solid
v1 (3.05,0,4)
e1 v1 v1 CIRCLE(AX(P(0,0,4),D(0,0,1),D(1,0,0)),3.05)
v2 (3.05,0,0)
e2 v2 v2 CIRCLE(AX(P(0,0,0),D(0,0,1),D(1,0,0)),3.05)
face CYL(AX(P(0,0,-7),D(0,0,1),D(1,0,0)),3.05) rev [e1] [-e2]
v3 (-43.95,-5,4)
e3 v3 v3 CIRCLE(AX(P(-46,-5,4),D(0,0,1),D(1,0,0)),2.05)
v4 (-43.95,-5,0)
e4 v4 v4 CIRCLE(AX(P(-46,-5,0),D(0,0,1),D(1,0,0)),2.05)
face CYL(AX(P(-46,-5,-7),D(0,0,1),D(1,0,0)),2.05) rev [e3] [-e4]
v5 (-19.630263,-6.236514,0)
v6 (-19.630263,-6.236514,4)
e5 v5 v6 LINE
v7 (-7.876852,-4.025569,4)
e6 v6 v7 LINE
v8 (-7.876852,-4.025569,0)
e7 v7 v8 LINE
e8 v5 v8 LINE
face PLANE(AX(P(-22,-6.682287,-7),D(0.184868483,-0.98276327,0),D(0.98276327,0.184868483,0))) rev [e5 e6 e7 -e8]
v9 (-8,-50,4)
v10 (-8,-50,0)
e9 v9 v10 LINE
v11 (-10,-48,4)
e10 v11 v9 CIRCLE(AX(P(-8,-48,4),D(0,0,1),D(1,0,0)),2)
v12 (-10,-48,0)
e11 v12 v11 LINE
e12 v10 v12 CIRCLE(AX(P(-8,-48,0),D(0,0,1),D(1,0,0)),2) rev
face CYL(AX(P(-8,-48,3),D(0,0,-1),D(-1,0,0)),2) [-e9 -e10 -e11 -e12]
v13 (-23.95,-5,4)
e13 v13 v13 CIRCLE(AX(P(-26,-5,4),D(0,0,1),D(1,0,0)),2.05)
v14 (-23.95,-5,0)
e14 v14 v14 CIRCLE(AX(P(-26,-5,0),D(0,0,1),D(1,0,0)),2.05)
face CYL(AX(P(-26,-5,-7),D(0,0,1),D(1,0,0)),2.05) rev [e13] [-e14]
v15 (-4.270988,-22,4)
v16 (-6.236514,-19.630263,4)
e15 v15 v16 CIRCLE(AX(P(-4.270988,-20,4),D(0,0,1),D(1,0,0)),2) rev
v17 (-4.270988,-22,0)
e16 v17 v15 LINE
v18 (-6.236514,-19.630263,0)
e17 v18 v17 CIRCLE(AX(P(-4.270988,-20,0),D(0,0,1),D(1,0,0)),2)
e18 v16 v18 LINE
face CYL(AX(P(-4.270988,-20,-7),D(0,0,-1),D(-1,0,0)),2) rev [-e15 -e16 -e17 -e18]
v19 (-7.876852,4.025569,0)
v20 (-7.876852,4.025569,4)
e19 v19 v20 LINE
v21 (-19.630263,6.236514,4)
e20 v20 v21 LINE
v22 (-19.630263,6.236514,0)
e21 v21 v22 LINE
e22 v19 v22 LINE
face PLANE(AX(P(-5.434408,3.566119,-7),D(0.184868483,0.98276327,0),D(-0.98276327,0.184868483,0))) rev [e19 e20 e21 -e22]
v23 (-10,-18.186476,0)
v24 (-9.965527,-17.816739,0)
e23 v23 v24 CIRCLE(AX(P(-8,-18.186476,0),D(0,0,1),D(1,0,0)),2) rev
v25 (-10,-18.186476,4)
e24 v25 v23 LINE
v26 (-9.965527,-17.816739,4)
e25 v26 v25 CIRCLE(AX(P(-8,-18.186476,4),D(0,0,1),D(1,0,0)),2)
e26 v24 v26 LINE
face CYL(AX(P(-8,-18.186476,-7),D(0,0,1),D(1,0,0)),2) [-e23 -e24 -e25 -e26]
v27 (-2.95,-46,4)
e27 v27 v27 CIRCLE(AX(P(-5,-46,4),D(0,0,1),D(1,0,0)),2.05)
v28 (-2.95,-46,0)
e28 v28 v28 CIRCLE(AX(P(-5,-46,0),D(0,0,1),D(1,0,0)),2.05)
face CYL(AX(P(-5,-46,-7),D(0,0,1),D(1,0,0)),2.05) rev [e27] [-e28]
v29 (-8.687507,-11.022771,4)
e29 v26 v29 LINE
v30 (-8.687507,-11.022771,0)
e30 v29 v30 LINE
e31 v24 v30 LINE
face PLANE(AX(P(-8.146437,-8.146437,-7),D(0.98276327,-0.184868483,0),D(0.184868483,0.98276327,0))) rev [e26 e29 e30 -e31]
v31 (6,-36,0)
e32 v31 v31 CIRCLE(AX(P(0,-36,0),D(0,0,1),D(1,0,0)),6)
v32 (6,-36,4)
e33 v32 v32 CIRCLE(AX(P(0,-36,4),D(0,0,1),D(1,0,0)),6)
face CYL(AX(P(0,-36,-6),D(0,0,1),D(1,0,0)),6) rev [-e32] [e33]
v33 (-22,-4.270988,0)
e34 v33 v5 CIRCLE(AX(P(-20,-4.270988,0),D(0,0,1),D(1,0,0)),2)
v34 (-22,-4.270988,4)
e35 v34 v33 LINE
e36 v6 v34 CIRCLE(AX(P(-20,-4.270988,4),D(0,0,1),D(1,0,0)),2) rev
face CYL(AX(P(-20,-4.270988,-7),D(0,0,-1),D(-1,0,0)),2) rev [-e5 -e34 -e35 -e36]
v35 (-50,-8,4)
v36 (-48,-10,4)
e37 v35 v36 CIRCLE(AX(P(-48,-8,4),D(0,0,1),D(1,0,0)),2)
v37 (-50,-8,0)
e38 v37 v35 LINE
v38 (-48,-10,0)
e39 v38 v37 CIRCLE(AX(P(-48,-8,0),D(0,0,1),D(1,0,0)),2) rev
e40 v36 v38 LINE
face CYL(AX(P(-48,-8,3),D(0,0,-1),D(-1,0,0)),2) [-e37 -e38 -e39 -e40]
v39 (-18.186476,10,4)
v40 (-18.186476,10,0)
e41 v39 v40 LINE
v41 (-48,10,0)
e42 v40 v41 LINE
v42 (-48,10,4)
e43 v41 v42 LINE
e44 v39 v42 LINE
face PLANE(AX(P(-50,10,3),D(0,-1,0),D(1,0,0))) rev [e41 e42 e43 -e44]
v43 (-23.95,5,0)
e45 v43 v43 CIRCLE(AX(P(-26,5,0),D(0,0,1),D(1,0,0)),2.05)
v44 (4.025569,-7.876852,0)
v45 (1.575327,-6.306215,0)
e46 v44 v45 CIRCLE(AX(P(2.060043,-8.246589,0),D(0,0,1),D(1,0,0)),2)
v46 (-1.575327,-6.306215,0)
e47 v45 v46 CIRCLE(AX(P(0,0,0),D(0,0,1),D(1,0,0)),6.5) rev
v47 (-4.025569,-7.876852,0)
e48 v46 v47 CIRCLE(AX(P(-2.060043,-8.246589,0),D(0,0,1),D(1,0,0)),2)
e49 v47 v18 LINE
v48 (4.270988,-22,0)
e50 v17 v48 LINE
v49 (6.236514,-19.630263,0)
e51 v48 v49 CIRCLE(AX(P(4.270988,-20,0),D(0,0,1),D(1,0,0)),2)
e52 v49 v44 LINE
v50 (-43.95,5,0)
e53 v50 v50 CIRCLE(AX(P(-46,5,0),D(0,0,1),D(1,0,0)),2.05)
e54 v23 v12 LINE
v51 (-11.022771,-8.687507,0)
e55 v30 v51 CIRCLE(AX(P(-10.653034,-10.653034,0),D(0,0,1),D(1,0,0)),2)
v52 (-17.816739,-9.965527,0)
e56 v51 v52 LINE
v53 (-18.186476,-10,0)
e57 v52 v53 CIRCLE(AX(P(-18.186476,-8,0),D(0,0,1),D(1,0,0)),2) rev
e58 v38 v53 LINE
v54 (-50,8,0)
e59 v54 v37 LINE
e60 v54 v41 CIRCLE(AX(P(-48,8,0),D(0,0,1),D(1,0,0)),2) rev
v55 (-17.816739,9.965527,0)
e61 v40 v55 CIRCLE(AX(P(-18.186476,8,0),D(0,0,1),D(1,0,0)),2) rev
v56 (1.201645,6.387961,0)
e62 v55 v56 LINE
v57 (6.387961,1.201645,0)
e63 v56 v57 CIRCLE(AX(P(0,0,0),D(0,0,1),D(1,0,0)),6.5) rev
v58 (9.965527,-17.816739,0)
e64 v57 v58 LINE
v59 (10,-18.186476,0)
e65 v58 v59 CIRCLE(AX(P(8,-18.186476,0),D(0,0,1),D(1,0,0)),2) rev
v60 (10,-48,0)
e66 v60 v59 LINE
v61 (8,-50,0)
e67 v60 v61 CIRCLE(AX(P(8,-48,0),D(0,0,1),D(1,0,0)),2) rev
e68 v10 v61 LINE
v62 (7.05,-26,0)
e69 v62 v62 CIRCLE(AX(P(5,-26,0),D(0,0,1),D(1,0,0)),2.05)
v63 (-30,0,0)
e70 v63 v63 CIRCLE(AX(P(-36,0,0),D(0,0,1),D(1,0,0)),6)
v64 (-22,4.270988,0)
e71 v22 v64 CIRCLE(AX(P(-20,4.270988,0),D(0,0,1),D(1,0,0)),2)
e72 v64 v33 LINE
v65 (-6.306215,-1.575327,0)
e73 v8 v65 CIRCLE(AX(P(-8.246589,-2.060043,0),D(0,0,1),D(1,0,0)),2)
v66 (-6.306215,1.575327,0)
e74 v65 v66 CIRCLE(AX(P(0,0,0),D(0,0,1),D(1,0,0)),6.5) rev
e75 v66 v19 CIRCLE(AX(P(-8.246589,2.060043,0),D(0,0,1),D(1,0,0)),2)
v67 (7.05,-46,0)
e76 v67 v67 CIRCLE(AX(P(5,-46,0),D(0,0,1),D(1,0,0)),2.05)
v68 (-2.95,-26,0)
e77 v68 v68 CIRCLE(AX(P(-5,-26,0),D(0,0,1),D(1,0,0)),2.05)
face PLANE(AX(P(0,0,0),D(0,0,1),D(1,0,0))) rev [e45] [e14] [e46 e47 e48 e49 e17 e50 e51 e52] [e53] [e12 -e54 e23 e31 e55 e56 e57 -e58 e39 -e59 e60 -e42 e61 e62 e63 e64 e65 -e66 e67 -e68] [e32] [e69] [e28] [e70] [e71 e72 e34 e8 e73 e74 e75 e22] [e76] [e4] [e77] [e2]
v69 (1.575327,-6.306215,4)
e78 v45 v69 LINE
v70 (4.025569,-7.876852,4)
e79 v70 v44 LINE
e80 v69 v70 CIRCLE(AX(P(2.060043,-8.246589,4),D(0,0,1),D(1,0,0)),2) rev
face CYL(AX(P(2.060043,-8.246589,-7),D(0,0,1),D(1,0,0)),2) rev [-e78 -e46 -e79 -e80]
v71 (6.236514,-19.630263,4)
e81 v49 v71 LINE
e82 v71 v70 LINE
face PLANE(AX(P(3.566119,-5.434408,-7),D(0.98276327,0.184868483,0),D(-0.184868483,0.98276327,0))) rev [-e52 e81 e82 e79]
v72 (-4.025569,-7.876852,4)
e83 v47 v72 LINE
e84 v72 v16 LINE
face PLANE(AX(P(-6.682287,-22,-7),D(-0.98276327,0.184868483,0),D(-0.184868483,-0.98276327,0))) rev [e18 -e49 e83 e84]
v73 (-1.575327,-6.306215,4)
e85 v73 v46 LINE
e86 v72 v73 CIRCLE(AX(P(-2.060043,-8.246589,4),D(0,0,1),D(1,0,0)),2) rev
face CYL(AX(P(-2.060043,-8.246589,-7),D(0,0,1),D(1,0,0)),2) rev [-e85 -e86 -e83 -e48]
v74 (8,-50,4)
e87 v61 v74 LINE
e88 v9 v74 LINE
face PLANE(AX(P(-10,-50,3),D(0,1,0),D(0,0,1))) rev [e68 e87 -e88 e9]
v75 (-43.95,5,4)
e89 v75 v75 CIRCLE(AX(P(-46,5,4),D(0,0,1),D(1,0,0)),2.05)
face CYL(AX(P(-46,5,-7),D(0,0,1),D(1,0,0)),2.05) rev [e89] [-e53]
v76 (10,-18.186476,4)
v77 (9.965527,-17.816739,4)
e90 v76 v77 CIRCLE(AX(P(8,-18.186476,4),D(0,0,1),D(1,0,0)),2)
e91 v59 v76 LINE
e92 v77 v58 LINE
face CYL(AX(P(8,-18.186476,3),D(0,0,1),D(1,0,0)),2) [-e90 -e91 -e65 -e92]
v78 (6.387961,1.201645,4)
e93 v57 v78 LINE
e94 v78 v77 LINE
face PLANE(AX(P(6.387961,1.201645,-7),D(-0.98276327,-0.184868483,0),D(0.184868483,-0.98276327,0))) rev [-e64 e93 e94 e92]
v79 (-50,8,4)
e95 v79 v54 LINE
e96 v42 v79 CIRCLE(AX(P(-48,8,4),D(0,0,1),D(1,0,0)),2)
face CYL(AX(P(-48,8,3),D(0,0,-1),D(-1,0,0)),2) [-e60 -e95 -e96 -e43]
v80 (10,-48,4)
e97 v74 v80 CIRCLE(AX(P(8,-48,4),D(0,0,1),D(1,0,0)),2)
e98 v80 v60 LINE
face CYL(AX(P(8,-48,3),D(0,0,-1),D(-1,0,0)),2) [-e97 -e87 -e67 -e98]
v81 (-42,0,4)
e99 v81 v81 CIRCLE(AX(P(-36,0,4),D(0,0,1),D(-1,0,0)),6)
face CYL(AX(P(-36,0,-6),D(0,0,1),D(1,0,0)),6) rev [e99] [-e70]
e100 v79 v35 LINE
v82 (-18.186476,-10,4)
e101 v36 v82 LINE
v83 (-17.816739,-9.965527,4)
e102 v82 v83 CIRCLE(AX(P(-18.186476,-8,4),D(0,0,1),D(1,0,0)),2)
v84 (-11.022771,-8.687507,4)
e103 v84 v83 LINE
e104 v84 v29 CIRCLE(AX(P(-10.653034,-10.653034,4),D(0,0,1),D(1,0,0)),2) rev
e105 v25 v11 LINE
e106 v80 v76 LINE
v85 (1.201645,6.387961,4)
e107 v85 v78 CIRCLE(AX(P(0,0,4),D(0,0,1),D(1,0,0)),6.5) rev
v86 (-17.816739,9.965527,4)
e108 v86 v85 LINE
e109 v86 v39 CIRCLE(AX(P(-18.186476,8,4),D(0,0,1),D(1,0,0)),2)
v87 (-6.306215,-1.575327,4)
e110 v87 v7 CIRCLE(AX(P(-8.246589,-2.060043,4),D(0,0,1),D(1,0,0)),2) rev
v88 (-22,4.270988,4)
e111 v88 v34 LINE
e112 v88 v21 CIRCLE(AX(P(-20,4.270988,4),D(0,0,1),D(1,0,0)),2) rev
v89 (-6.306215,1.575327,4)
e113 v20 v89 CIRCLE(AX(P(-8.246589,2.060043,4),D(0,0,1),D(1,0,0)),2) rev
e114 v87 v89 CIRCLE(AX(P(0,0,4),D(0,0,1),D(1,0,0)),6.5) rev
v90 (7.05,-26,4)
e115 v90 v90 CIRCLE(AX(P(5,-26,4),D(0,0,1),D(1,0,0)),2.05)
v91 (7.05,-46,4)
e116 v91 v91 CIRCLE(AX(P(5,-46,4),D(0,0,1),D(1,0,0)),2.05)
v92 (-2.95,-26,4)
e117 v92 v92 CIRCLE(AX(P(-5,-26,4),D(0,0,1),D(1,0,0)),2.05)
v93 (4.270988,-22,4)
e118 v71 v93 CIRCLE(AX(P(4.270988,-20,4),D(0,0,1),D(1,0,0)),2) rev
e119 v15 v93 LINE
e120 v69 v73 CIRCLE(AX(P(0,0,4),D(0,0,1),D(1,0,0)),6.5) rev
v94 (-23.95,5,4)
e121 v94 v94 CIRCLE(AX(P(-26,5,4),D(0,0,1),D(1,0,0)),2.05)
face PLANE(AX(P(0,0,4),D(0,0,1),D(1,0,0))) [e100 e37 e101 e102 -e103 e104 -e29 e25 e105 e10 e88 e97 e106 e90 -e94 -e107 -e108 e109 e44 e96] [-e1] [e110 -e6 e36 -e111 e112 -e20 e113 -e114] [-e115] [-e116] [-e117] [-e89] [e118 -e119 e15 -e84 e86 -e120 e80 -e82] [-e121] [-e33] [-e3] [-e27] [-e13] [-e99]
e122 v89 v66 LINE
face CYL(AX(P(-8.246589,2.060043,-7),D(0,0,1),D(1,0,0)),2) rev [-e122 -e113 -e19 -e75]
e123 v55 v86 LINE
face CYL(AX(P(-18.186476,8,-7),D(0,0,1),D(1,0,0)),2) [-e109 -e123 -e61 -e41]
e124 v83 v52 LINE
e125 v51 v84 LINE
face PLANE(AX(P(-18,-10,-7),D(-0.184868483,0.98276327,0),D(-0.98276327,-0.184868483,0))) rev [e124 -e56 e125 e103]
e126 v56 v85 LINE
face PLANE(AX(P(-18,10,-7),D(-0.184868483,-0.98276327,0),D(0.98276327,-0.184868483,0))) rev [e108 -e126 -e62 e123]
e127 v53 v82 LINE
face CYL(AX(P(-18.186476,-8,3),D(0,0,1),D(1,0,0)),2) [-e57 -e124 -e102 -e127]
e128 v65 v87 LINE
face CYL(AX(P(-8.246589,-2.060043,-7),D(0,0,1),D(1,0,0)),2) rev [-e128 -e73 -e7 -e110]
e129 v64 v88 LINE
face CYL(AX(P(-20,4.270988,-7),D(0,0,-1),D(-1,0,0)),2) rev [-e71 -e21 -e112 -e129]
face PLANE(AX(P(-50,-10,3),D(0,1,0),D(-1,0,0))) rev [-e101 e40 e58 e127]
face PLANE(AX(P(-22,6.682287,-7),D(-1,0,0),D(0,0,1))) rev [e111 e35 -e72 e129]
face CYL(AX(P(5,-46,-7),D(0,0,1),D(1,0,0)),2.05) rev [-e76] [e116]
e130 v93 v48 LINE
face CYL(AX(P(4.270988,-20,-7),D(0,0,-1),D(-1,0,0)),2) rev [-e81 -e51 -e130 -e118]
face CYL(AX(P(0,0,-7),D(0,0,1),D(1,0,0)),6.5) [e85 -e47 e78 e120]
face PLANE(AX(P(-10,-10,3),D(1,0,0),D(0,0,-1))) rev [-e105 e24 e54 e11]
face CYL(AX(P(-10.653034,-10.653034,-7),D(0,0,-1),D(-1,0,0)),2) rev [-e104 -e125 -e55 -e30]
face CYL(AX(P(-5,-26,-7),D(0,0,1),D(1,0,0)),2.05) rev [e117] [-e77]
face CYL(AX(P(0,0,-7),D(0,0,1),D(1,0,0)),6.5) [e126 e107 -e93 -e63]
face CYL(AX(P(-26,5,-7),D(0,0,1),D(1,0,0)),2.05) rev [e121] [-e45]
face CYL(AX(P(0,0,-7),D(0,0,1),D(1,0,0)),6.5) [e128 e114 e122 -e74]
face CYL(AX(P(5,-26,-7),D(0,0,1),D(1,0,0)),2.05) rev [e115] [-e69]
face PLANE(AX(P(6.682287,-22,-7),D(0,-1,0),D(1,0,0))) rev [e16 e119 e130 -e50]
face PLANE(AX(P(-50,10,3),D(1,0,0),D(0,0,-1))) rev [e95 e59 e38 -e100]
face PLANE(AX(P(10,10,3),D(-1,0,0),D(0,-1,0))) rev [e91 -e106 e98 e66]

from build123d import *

# Parameters (mm, degrees)
EXTRUDE_1_DEPTH         = 3
SKETCH_2_R              = 2.05
CUT_EXTRUDE_1_DEPTH     = 10
CUT_EXTRUDE_2_DEPTH     = 10
SKETCH_4_R              = 3.05
CUT_EXTRUDE_3_DEPTH     = 10
SKETCH_5_W              = 14
SKETCH_5_H              = 10
SKETCH_5_W_2            = 10
SKETCH_5_H_2            = 14
CUT_EXTRUDE_4_DEPTH     = 10
FILLET_1_R              = 2
FILLET_2_R              = 2
MOVE_START              = 3
MOVE_FACE_1_OUTLINE_R   = 2.05
MOVE_FACE_1_OUTLINE_R_2 = 3.05
MOVE_FACE_1_DEPTH       = 1
SKETCH_9_W              = 14
SKETCH_9_H              = 10
SKETCH_9_W_2            = 10
SKETCH_9_H_2            = 14
EXTRUDE_2_DEPTH         = 4
SKETCH_14_R             = 6
SKETCH_14_R_2           = 2.05
CUT_EXTRUDE_8_DEPTH     = 10


# Read off the part's stored shape, not the designer's step: 移动面1
with BuildPart() as part:
    # 草图1 → 凸台-拉伸1 (new body)
    with BuildSketch(Plane.XY):
        Polygon((-50, 10), (10, 10), (10, -50), (-10, -50), (-10, -10), (-50, -10), align=None)
    extrude(amount=EXTRUDE_1_DEPTH)

    # 草图2 → 切除-拉伸1 (cut)
    with BuildSketch(Plane.XY.offset(3)):
        with Locations((-26, -5)):
            Circle(SKETCH_2_R)
        with Locations((-46, 5)):
            Circle(SKETCH_2_R)
        with Locations((-46, -5)):
            Circle(SKETCH_2_R)
        with Locations((-26, 5)):
            Circle(SKETCH_2_R)
        with Locations((5, -26)):
            Circle(SKETCH_2_R)
        with Locations((-5, -46)):
            Circle(SKETCH_2_R)
        with Locations((5, -46)):
            Circle(SKETCH_2_R)
        with Locations((-5, -26)):
            Circle(SKETCH_2_R)
    extrude(amount=-CUT_EXTRUDE_1_DEPTH, mode=Mode.SUBTRACT)

    # 草图3 → 切除-拉伸2 (cut)
    with BuildSketch(Plane.XY.offset(3)):
        with BuildLine():
            Line((-18, 10), (1.20164514, 6.387961252))
            ThreePointArc((1.20164514, 6.387961252), (4.596194078, 4.596194078), (6.387961252, 1.20164514))
            Line((6.387961252, 1.20164514), (10, -18))
            Line((10, -18), (10, 10))
            Line((10, 10), (-18, 10))
        make_face()
        Polygon((-18, -10), (-8.146437488, -8.146437488), (-10, -18), align=None)
    extrude(amount=-CUT_EXTRUDE_2_DEPTH, mode=Mode.SUBTRACT)

    # 草图4 → 切除-拉伸3 (cut)
    with BuildSketch(Plane.XY.offset(3)):
        Circle(SKETCH_4_R)
    extrude(amount=-CUT_EXTRUDE_3_DEPTH, mode=Mode.SUBTRACT)

    # 草图5 → 切除-拉伸4 (cut)
    with BuildSketch(Plane.XY.offset(3)):
        with Locations((-36, 0)):
            Rectangle(SKETCH_5_W, SKETCH_5_H)
        with BuildLine():
            Line((-22, 6.682287415), (-22, -6.682287415))
            Line((-22, -6.682287415), (-5.43440841, -3.566119072))
            ThreePointArc((-5.43440841, -3.566119072), (-6.5, 0), (-5.43440841, 3.566119072))
            Line((-5.43440841, 3.566119072), (-22, 6.682287415))
        make_face()
        with BuildLine():
            Line((3.566119072, -5.43440841), (6.682287415, -22))
            Line((6.682287415, -22), (-6.682287415, -22))
            Line((-6.682287415, -22), (-3.566119072, -5.43440841))
            ThreePointArc((-3.566119072, -5.43440841), (0, -6.5), (3.566119072, -5.43440841))
        make_face()
        with Locations((0, -36)):
            Rectangle(SKETCH_5_W_2, SKETCH_5_H_2)
    extrude(amount=-CUT_EXTRUDE_4_DEPTH, mode=Mode.SUBTRACT)

    # 圆角1
    fillet_1_edges = [part.edges().sort_by_distance(p)[0] for p in [
        (-29, 5, 1.5),
        (-29, -5, 1.5),
        (-43, -5, 1.5),
        (-43, 5, 1.5),
        (-3.566119072, -5.43440841, 1.5),
        (3.566119072, -5.43440841, 1.5),
        (6.682287415, -22, 1.5),
        (-6.682287415, -22, 1.5),
        (5, -43, 1.5),
        (-5, -43, 1.5),
        (-5, -29, 1.5),
        (5, -29, 1.5),
        (-22, 6.682287415, 1.5),
        (-5.43440841, 3.566119072, 1.5),
        (-5.43440841, -3.566119072, 1.5),
        (-22, -6.682287415, 1.5),
    ]]
    fillet(fillet_1_edges, radius=FILLET_1_R)

    # 圆角2
    fillet_2_edges = [part.edges().sort_by_distance(p)[0] for p in [
        (-50, 10, 1.5),
        (10, -50, 1.5),
        (-10, -50, 1.5),
        (-50, -10, 1.5),
        (-18, -10, 1.5),
        (-8.146437488, -8.146437488, 1.5),
        (-10, -18, 1.5),
        (-18, 10, 1.5),
        (10, -18, 1.5),
    ]]
    fillet(fillet_2_edges, radius=FILLET_2_R)

    # Move Face 1 outline → Move Face 1 (add)
    with BuildSketch(Plane.XY.offset(MOVE_START)):
        with BuildLine():
            Line((-50, 8), (-50, -8))
            ThreePointArc((-50, -8), (-49.414213562, -9.414213562), (-48, -10))
            Line((-48, -10), (-18.186475598, -10))
            ThreePointArc((-18.186475598, -10), (-18.000805296, -9.991362985), (-17.816738632, -9.965526539))
            Line((-17.816738632, -9.965526539), (-11.022770604, -8.687507099))
            ThreePointArc((-11.022770604, -8.687507099), (-9.238820076, -9.238820076), (-8.687507099, -11.022770604))
            Line((-8.687507099, -11.022770604), (-9.965526539, -17.816738632))
            ThreePointArc((-9.965526539, -17.816738632), (-9.991362985, -18.000805296), (-10, -18.186475598))
            Line((-10, -18.186475598), (-10, -48))
            ThreePointArc((-10, -48), (-9.414213562, -49.414213562), (-8, -50))
            Line((-8, -50), (8, -50))
            ThreePointArc((8, -50), (9.414213562, -49.414213562), (10, -48))
            Line((10, -48), (10, -18.186475598))
            ThreePointArc((10, -18.186475598), (9.991362985, -18.000805296), (9.965526539, -17.816738632))
            Line((9.965526539, -17.816738632), (6.387961252, 1.20164514))
            ThreePointArc((6.387961252, 1.20164514), (4.596194078, 4.596194078), (1.20164514, 6.387961252))
            Line((1.20164514, 6.387961252), (-17.816738632, 9.965526539))
            ThreePointArc((-17.816738632, 9.965526539), (-18.000805296, 9.991362985), (-18.186475598, 10))
            Line((-18.186475598, 10), (-48, 10))
            ThreePointArc((-48, 10), (-49.414213562, 9.414213562), (-50, 8))
        make_face()
        with Locations((-5, -46)):
            Circle(MOVE_FACE_1_OUTLINE_R, mode=Mode.SUBTRACT)
        with Locations((5, -46)):
            Circle(MOVE_FACE_1_OUTLINE_R, mode=Mode.SUBTRACT)
        with BuildLine():
            Line((3, -43), (-3, -43))
            ThreePointArc((-3, -43), (-4.414213562, -42.414213562), (-5, -41))
            Line((-5, -41), (-5, -31))
            ThreePointArc((-5, -31), (-4.414213562, -29.585786438), (-3, -29))
            Line((-3, -29), (3, -29))
            ThreePointArc((3, -29), (4.414213562, -29.585786438), (5, -31))
            Line((5, -31), (5, -41))
            ThreePointArc((5, -41), (4.414213562, -42.414213562), (3, -43))
        make_face(mode=Mode.SUBTRACT)
        with Locations((-5, -26)):
            Circle(MOVE_FACE_1_OUTLINE_R, mode=Mode.SUBTRACT)
        with Locations((5, -26)):
            Circle(MOVE_FACE_1_OUTLINE_R, mode=Mode.SUBTRACT)
        with Locations((-46, -5)):
            Circle(MOVE_FACE_1_OUTLINE_R, mode=Mode.SUBTRACT)
        with BuildLine():
            Line((-29, 3), (-29, -3))
            ThreePointArc((-29, -3), (-29.585786438, -4.414213562), (-31, -5))
            Line((-31, -5), (-41, -5))
            ThreePointArc((-41, -5), (-42.414213562, -4.414213562), (-43, -3))
            Line((-43, -3), (-43, 3))
            ThreePointArc((-43, 3), (-42.414213562, 4.414213562), (-41, 5))
            Line((-41, 5), (-31, 5))
            ThreePointArc((-31, 5), (-29.585786438, 4.414213562), (-29, 3))
        make_face(mode=Mode.SUBTRACT)
        with Locations((-46, 5)):
            Circle(MOVE_FACE_1_OUTLINE_R, mode=Mode.SUBTRACT)
        with Locations((-26, -5)):
            Circle(MOVE_FACE_1_OUTLINE_R, mode=Mode.SUBTRACT)
        with Locations((-26, 5)):
            Circle(MOVE_FACE_1_OUTLINE_R, mode=Mode.SUBTRACT)
        with BuildLine():
            ThreePointArc((-4.02556927, -7.876851659), (-3.139359655, -6.562820535), (-1.575326794, -6.306214831))
            ThreePointArc((-1.575326794, -6.306214831), (0, -6.5), (1.575326794, -6.306214831))
            ThreePointArc((1.575326794, -6.306214831), (3.139359655, -6.562820535), (4.02556927, -7.876851659))
            Line((4.02556927, -7.876851659), (6.236514061, -19.630263034))
            ThreePointArc((6.236514061, -19.630263034), (5.810382522, -21.276817541), (4.270987522, -22))
            Line((4.270987522, -22), (-4.270987522, -22))
            ThreePointArc((-4.270987522, -22), (-5.810382522, -21.276817541), (-6.236514061, -19.630263034))
            Line((-6.236514061, -19.630263034), (-4.02556927, -7.876851659))
        make_face(mode=Mode.SUBTRACT)
        with BuildLine():
            ThreePointArc((-7.876851659, 4.02556927), (-6.562820535, 3.139359655), (-6.306214831, 1.575326794))
            ThreePointArc((-6.306214831, 1.575326794), (-6.5, 0), (-6.306214831, -1.575326794))
            ThreePointArc((-6.306214831, -1.575326794), (-6.562820535, -3.139359655), (-7.876851659, -4.02556927))
            Line((-7.876851659, -4.02556927), (-19.630263034, -6.236514061))
            ThreePointArc((-19.630263034, -6.236514061), (-21.276817541, -5.810382522), (-22, -4.270987522))
            Line((-22, -4.270987522), (-22, 4.270987522))
            ThreePointArc((-22, 4.270987522), (-21.276817541, 5.810382522), (-19.630263034, 6.236514061))
            Line((-19.630263034, 6.236514061), (-7.876851659, 4.02556927))
        make_face(mode=Mode.SUBTRACT)
        Circle(MOVE_FACE_1_OUTLINE_R_2, mode=Mode.SUBTRACT)
    extrude(amount=MOVE_FACE_1_DEPTH)

    # 草图9 → 凸台-拉伸2 (add)
    with BuildSketch(Plane.XY.offset(4)):
        with Locations((-36, 0)):
            Rectangle(SKETCH_9_W, SKETCH_9_H)
        with Locations((0, -36)):
            Rectangle(SKETCH_9_W_2, SKETCH_9_H_2)
    extrude(amount=-EXTRUDE_2_DEPTH)

    # 草图14 → 切除-拉伸8 (cut)
    with BuildSketch(Plane.XY.offset(4)):
        with Locations((0, -36)):
            Circle(SKETCH_14_R)
        with Locations((5, -26)):
            Circle(SKETCH_14_R_2)
        with Locations((-5, -26)):
            Circle(SKETCH_14_R_2)
        with Locations((-36, 0)):
            Circle(SKETCH_14_R)
    extrude(amount=-CUT_EXTRUDE_8_DEPTH, mode=Mode.SUBTRACT)


solid = part.part
